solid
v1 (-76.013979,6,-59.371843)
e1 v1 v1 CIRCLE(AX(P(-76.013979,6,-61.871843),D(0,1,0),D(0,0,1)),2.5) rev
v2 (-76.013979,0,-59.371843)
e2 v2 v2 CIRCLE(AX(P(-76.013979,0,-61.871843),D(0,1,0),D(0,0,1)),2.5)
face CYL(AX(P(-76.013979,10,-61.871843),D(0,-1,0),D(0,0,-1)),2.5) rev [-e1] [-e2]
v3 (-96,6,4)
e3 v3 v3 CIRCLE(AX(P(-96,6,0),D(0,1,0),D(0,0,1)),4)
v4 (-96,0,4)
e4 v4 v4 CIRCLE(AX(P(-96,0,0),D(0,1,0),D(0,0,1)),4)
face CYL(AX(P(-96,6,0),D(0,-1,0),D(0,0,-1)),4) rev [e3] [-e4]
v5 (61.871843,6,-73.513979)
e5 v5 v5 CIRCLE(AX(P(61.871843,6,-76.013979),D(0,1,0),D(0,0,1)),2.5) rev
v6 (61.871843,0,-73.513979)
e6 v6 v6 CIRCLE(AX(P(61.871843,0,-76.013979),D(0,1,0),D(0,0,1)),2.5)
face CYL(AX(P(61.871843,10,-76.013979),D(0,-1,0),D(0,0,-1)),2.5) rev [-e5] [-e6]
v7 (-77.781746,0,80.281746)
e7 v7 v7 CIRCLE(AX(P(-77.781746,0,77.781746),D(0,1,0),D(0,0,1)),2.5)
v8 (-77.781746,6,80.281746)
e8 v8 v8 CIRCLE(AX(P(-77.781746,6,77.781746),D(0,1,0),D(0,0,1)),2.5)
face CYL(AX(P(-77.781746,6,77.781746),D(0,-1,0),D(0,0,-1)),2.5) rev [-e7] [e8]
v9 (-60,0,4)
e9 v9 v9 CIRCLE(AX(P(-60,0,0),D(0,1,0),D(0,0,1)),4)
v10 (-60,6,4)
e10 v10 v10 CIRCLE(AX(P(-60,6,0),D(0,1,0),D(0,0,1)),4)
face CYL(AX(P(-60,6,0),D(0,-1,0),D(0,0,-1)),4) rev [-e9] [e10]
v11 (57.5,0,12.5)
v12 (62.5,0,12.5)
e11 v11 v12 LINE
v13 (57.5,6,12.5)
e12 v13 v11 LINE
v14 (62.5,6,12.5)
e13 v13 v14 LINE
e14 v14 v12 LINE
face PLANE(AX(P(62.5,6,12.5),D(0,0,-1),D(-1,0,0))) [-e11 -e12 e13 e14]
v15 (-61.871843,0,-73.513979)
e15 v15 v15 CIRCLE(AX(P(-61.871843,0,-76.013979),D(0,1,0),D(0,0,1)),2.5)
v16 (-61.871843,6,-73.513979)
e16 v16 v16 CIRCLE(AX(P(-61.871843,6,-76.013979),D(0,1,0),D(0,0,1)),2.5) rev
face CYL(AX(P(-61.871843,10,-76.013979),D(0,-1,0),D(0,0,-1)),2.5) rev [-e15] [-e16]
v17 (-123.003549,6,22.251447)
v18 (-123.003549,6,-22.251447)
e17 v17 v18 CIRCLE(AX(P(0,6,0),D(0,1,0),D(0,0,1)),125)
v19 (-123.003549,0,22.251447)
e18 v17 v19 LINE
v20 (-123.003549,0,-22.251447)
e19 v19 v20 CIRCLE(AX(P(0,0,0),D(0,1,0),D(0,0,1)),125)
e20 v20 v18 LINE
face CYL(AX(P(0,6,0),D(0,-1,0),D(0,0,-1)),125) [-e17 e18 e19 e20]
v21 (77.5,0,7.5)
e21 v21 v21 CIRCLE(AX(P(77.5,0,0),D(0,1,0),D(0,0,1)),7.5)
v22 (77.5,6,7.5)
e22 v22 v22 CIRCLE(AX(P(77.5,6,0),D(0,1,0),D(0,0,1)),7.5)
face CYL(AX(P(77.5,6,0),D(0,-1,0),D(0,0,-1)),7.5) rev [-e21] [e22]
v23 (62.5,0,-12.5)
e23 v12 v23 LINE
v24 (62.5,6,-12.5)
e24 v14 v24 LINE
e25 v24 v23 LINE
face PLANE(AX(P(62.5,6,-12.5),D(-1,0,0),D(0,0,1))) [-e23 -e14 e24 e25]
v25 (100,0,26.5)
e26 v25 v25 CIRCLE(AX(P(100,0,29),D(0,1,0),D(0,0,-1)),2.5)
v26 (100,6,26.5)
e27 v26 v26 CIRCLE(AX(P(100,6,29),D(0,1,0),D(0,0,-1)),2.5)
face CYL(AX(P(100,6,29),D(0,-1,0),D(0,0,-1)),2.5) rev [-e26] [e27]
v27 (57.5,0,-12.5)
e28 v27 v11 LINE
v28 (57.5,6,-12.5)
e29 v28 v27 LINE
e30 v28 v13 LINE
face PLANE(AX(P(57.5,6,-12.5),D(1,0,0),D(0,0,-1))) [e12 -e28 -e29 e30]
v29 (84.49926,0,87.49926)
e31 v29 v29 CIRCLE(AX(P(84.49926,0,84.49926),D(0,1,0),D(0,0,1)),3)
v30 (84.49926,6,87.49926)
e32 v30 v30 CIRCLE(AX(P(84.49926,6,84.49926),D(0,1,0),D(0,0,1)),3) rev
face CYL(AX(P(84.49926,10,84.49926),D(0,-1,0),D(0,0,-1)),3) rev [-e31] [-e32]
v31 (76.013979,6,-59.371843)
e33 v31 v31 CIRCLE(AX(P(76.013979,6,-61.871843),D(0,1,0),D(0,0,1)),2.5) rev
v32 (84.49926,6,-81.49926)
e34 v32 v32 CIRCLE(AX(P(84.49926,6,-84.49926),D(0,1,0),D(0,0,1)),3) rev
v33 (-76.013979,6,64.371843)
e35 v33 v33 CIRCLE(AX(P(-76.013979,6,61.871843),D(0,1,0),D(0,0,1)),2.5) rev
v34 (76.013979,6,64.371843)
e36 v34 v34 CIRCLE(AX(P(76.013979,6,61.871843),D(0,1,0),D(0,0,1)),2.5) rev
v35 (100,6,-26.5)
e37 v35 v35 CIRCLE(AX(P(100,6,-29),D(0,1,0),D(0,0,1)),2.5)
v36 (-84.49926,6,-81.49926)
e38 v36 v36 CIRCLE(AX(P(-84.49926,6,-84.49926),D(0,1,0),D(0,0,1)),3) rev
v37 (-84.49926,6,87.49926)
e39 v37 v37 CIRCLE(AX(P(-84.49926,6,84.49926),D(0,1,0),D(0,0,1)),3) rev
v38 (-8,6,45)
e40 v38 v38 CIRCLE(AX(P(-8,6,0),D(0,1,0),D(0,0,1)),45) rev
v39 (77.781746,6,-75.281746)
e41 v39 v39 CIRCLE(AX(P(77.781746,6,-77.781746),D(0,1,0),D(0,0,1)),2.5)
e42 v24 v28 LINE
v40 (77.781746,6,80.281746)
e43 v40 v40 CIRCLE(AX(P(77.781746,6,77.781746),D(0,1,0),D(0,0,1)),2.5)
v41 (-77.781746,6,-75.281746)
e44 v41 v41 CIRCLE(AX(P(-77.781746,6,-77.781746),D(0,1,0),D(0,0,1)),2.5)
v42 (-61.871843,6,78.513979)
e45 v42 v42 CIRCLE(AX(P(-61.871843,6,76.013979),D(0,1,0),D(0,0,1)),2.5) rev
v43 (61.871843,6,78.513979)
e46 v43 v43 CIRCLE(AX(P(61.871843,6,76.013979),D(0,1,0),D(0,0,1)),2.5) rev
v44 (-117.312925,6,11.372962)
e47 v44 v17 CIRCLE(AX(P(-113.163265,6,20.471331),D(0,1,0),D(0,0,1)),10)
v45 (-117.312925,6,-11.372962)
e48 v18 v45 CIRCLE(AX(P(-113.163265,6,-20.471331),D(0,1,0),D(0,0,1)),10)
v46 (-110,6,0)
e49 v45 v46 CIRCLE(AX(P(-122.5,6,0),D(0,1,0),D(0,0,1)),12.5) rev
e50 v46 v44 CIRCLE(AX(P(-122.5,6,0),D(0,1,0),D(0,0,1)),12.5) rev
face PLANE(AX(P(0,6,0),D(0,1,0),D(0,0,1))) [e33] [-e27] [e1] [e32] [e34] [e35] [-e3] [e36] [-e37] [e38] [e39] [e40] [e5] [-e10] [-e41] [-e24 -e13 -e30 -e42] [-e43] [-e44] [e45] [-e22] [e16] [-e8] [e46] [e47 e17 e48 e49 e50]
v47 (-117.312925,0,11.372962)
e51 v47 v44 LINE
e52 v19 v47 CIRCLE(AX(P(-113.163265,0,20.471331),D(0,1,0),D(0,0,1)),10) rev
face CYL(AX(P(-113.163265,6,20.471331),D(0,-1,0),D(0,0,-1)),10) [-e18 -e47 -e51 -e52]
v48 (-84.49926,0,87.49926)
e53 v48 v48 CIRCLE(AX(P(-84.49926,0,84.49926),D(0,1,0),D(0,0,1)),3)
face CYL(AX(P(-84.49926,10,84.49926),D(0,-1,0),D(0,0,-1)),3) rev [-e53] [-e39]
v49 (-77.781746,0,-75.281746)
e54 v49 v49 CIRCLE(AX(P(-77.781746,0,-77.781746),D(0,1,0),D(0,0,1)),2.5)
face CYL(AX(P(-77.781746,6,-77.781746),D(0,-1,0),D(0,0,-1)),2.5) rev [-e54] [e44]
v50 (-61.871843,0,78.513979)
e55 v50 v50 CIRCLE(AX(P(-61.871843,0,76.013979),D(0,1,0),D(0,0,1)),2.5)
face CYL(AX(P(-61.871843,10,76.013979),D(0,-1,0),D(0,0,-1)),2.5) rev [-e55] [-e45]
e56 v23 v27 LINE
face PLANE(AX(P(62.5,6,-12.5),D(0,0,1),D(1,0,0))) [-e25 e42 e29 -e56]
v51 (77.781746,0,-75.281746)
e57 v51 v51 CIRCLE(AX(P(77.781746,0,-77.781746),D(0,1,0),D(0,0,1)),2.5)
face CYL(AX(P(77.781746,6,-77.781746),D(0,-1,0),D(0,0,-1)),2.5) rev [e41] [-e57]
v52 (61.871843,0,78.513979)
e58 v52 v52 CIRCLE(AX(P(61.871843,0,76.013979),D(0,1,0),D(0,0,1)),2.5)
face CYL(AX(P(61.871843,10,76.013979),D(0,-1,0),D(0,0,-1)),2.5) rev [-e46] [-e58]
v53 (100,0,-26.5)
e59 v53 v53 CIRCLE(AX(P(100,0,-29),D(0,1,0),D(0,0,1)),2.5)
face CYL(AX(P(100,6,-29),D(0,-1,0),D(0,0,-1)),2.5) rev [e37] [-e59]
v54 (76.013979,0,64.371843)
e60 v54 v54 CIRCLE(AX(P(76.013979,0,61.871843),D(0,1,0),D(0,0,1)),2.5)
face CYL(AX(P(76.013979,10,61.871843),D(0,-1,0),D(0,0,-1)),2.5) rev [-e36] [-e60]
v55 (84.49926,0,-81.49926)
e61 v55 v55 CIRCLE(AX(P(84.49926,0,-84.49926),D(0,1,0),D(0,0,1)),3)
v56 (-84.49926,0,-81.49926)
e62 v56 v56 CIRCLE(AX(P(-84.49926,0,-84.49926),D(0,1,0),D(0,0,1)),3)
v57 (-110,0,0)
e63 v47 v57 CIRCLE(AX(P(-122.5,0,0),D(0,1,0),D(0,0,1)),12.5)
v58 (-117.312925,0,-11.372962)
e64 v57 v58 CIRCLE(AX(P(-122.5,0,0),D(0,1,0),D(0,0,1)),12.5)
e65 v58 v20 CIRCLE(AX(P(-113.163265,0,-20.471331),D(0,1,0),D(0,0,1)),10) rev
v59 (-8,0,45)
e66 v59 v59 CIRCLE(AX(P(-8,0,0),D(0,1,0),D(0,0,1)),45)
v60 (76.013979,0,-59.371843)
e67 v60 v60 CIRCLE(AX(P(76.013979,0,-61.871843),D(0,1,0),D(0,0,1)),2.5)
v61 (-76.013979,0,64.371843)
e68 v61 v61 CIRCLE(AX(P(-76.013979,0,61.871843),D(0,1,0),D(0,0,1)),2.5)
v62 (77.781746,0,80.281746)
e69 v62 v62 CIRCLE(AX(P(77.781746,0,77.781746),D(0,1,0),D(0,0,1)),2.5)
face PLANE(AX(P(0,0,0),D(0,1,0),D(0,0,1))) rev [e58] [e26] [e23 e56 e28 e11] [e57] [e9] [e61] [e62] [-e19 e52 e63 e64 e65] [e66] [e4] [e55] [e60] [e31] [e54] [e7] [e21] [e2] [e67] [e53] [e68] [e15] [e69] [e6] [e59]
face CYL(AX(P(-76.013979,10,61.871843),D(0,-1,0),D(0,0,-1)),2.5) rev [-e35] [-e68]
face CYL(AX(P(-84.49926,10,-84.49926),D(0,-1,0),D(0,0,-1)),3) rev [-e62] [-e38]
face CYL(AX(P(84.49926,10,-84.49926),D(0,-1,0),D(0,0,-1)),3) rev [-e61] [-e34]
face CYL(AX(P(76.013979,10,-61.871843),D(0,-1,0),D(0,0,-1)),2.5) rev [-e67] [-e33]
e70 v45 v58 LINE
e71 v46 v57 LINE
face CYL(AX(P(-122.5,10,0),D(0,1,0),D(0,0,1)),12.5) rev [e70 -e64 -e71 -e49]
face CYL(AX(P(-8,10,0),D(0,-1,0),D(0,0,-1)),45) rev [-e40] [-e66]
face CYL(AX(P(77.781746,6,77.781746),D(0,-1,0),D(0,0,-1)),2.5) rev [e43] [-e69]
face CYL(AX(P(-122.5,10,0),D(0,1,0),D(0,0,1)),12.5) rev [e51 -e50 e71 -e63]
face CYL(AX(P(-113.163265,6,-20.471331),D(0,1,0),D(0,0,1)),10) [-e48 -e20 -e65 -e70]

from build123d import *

# Parameters (mm, degrees)
SKETCH1_R                    = 125
SKETCH1_R_2                  = 4
BOSS_EXTRUDE1_DEPTH          = 6
SKETCH2_R                    = 2.5
BYPASS_HOLE_FOR_SPRING_DEPTH = 177.878489365
SKETCH5_R                    = 45
BYPASS_HOLE_DEPTH            = 10
SKETCH7_R                    = 2.5
CUT_EXTRUDE3_DEPTH           = 177.878489365
SKETCH10_R                   = 7.5
WIRING_PASS_THROUGH_DEPTH    = 6
SKETCH11_W                   = 25
SKETCH11_H                   = 25
CUT_EXTRUDE7_DEPTH           = 10
FILLET2_R                    = 12.5
FILLET3_R                    = 10
SKETCH13_R                   = 2.5
SKETCH13_R_2                 = 3
CUT_EXTRUDE9_DEPTH           = 10
SKETCH14_W                   = 5
SKETCH14_H                   = 25
CUT_EXTRUDE10_DEPTH          = 6


with BuildPart() as part:
    # Sketch1 → Boss-Extrude1 (new body)
    with BuildSketch(Plane(origin=(0, 0, 0), x_dir=(1, 0, 0), z_dir=(0, 1, 0))):
        with Locations(Location((0, 0, 0), (0, 0, 270))):
            Circle(SKETCH1_R)
        with Locations(Location((-96, 0, 0), (0, 0, 270))):
            Circle(SKETCH1_R_2, mode=Mode.SUBTRACT)
        with Locations(Location((-60, 0, 0), (0, 0, 270))):
            Circle(SKETCH1_R_2, mode=Mode.SUBTRACT)
    extrude(amount=BOSS_EXTRUDE1_DEPTH)

    # Sketch2 → Bypass Hole for Spring (cut, through all)
    with BuildSketch(Plane(origin=(0, 0, 0), x_dir=(1, 0, 0), z_dir=(0, 1, 0))):
        with Locations(Location((-77.781745931, 77.781745931, 0), (0, 0, 270))):
            Circle(SKETCH2_R)
        with Locations(Location((77.781745931, 77.781745931, 0), (0, 0, 270))):
            Circle(SKETCH2_R)
        with Locations(Location((77.781745931, -77.781745931, 0), (0, 0, 270))):
            Circle(SKETCH2_R)
        with Locations(Location((-77.781745931, -77.781745931, 0), (0, 0, 270))):
            Circle(SKETCH2_R)
    extrude(amount=BYPASS_HOLE_FOR_SPRING_DEPTH, mode=Mode.SUBTRACT)

    # Sketch5 → Bypass Hole (cut)
    with BuildSketch(Plane(origin=(0, 0, 0), x_dir=(1, 0, 0), z_dir=(0, 1, 0))):
        with Locations(Location((-8, 0, 0), (0, 0, 270))):
            Circle(SKETCH5_R)
    extrude(amount=BYPASS_HOLE_DEPTH, mode=Mode.SUBTRACT)

    # Sketch7 → Cut-Extrude3 (cut, through all)
    with BuildSketch(Plane(origin=(0, 0, 0), x_dir=(1, 0, 0), z_dir=(0, 1, 0))):
        with Locations(Location((100, 29, 0), (0, 0, 270))):
            Circle(SKETCH7_R)
        with Locations(Location((100, -29, 0), (0, 0, 90))):
            Circle(SKETCH7_R)
    extrude(amount=CUT_EXTRUDE3_DEPTH, mode=Mode.SUBTRACT)

    # Sketch10 → Wiring Pass Through (cut)
    with BuildSketch(Plane(origin=(0, 0, 0), x_dir=(1, 0, 0), z_dir=(0, 1, 0))):
        with Locations(Location((77.5, 0, 0), (0, 0, 270))):
            Circle(SKETCH10_R)
    extrude(amount=WIRING_PASS_THROUGH_DEPTH, mode=Mode.SUBTRACT)

    # Sketch11 → Cut-Extrude7 (cut)
    with BuildSketch(Plane(origin=(0, 0, 0), x_dir=(1, 0, 0), z_dir=(0, 1, 0))):
        with Locations((-122.5, 0)):
            Rectangle(SKETCH11_W, SKETCH11_H)
    extrude(amount=CUT_EXTRUDE7_DEPTH, mode=Mode.SUBTRACT)

    # Fillet2
    fillet2_edges = [part.edges().sort_by_distance(p)[0] for p in [
        (-110, 3, 12.5),
        (-110, 3, -12.5),
    ]]
    fillet(fillet2_edges, radius=FILLET2_R - 0.0001)  # a hair under: the kernel refuses the full size

    # Fillet3
    fillet3_edges = [part.edges().sort_by_distance(p)[0] for p in [
        (-124.373429638, 3, 12.5),
        (-124.373429638, 3, -12.5),
    ]]
    fillet(fillet3_edges, radius=FILLET3_R)

    # Sketch13 → Cut-Extrude9 (cut)
    with BuildSketch(Plane(origin=(0, 0, 0), x_dir=(1, 0, 0), z_dir=(0, 1, 0))):
        with Locations(Location((76.013978978, -61.871843354, 0), (0, 0, 270))):
            Circle(SKETCH13_R)
        with Locations(Location((61.871843354, -76.013978977, 0), (0, 0, 270))):
            Circle(SKETCH13_R)
        with Locations(Location((84.499260352, -84.499260352, 0), (0, 0, 270))):
            Circle(SKETCH13_R_2)
        with Locations(Location((-61.871843354, -76.013978978, 0), (0, 0, 270))):
            Circle(SKETCH13_R)
        with Locations(Location((-76.013978977, -61.871843354, 0), (0, 0, 270))):
            Circle(SKETCH13_R)
        with Locations(Location((-84.499260352, -84.499260352, 0), (0, 0, 270))):
            Circle(SKETCH13_R_2)
        with Locations(Location((-76.013978978, 61.871843354, 0), (0, 0, 270))):
            Circle(SKETCH13_R)
        with Locations(Location((-61.871843354, 76.013978977, 0), (0, 0, 270))):
            Circle(SKETCH13_R)
        with Locations(Location((-84.499260352, 84.499260352, 0), (0, 0, 270))):
            Circle(SKETCH13_R_2)
        with Locations(Location((61.871843354, 76.013978978, 0), (0, 0, 270))):
            Circle(SKETCH13_R)
        with Locations(Location((76.013978977, 61.871843354, 0), (0, 0, 270))):
            Circle(SKETCH13_R)
        with Locations(Location((84.499260352, 84.499260352, 0), (0, 0, 270))):
            Circle(SKETCH13_R_2)
    extrude(amount=CUT_EXTRUDE9_DEPTH, mode=Mode.SUBTRACT)

    # Sketch14 → Cut-Extrude10 (cut)
    with BuildSketch(Plane(origin=(0, 0, 0), x_dir=(1, 0, 0), z_dir=(0, 1, 0))):
        with Locations((60, 0)):
            Rectangle(SKETCH14_W, SKETCH14_H)
    extrude(amount=CUT_EXTRUDE10_DEPTH, mode=Mode.SUBTRACT)


solid = part.part
